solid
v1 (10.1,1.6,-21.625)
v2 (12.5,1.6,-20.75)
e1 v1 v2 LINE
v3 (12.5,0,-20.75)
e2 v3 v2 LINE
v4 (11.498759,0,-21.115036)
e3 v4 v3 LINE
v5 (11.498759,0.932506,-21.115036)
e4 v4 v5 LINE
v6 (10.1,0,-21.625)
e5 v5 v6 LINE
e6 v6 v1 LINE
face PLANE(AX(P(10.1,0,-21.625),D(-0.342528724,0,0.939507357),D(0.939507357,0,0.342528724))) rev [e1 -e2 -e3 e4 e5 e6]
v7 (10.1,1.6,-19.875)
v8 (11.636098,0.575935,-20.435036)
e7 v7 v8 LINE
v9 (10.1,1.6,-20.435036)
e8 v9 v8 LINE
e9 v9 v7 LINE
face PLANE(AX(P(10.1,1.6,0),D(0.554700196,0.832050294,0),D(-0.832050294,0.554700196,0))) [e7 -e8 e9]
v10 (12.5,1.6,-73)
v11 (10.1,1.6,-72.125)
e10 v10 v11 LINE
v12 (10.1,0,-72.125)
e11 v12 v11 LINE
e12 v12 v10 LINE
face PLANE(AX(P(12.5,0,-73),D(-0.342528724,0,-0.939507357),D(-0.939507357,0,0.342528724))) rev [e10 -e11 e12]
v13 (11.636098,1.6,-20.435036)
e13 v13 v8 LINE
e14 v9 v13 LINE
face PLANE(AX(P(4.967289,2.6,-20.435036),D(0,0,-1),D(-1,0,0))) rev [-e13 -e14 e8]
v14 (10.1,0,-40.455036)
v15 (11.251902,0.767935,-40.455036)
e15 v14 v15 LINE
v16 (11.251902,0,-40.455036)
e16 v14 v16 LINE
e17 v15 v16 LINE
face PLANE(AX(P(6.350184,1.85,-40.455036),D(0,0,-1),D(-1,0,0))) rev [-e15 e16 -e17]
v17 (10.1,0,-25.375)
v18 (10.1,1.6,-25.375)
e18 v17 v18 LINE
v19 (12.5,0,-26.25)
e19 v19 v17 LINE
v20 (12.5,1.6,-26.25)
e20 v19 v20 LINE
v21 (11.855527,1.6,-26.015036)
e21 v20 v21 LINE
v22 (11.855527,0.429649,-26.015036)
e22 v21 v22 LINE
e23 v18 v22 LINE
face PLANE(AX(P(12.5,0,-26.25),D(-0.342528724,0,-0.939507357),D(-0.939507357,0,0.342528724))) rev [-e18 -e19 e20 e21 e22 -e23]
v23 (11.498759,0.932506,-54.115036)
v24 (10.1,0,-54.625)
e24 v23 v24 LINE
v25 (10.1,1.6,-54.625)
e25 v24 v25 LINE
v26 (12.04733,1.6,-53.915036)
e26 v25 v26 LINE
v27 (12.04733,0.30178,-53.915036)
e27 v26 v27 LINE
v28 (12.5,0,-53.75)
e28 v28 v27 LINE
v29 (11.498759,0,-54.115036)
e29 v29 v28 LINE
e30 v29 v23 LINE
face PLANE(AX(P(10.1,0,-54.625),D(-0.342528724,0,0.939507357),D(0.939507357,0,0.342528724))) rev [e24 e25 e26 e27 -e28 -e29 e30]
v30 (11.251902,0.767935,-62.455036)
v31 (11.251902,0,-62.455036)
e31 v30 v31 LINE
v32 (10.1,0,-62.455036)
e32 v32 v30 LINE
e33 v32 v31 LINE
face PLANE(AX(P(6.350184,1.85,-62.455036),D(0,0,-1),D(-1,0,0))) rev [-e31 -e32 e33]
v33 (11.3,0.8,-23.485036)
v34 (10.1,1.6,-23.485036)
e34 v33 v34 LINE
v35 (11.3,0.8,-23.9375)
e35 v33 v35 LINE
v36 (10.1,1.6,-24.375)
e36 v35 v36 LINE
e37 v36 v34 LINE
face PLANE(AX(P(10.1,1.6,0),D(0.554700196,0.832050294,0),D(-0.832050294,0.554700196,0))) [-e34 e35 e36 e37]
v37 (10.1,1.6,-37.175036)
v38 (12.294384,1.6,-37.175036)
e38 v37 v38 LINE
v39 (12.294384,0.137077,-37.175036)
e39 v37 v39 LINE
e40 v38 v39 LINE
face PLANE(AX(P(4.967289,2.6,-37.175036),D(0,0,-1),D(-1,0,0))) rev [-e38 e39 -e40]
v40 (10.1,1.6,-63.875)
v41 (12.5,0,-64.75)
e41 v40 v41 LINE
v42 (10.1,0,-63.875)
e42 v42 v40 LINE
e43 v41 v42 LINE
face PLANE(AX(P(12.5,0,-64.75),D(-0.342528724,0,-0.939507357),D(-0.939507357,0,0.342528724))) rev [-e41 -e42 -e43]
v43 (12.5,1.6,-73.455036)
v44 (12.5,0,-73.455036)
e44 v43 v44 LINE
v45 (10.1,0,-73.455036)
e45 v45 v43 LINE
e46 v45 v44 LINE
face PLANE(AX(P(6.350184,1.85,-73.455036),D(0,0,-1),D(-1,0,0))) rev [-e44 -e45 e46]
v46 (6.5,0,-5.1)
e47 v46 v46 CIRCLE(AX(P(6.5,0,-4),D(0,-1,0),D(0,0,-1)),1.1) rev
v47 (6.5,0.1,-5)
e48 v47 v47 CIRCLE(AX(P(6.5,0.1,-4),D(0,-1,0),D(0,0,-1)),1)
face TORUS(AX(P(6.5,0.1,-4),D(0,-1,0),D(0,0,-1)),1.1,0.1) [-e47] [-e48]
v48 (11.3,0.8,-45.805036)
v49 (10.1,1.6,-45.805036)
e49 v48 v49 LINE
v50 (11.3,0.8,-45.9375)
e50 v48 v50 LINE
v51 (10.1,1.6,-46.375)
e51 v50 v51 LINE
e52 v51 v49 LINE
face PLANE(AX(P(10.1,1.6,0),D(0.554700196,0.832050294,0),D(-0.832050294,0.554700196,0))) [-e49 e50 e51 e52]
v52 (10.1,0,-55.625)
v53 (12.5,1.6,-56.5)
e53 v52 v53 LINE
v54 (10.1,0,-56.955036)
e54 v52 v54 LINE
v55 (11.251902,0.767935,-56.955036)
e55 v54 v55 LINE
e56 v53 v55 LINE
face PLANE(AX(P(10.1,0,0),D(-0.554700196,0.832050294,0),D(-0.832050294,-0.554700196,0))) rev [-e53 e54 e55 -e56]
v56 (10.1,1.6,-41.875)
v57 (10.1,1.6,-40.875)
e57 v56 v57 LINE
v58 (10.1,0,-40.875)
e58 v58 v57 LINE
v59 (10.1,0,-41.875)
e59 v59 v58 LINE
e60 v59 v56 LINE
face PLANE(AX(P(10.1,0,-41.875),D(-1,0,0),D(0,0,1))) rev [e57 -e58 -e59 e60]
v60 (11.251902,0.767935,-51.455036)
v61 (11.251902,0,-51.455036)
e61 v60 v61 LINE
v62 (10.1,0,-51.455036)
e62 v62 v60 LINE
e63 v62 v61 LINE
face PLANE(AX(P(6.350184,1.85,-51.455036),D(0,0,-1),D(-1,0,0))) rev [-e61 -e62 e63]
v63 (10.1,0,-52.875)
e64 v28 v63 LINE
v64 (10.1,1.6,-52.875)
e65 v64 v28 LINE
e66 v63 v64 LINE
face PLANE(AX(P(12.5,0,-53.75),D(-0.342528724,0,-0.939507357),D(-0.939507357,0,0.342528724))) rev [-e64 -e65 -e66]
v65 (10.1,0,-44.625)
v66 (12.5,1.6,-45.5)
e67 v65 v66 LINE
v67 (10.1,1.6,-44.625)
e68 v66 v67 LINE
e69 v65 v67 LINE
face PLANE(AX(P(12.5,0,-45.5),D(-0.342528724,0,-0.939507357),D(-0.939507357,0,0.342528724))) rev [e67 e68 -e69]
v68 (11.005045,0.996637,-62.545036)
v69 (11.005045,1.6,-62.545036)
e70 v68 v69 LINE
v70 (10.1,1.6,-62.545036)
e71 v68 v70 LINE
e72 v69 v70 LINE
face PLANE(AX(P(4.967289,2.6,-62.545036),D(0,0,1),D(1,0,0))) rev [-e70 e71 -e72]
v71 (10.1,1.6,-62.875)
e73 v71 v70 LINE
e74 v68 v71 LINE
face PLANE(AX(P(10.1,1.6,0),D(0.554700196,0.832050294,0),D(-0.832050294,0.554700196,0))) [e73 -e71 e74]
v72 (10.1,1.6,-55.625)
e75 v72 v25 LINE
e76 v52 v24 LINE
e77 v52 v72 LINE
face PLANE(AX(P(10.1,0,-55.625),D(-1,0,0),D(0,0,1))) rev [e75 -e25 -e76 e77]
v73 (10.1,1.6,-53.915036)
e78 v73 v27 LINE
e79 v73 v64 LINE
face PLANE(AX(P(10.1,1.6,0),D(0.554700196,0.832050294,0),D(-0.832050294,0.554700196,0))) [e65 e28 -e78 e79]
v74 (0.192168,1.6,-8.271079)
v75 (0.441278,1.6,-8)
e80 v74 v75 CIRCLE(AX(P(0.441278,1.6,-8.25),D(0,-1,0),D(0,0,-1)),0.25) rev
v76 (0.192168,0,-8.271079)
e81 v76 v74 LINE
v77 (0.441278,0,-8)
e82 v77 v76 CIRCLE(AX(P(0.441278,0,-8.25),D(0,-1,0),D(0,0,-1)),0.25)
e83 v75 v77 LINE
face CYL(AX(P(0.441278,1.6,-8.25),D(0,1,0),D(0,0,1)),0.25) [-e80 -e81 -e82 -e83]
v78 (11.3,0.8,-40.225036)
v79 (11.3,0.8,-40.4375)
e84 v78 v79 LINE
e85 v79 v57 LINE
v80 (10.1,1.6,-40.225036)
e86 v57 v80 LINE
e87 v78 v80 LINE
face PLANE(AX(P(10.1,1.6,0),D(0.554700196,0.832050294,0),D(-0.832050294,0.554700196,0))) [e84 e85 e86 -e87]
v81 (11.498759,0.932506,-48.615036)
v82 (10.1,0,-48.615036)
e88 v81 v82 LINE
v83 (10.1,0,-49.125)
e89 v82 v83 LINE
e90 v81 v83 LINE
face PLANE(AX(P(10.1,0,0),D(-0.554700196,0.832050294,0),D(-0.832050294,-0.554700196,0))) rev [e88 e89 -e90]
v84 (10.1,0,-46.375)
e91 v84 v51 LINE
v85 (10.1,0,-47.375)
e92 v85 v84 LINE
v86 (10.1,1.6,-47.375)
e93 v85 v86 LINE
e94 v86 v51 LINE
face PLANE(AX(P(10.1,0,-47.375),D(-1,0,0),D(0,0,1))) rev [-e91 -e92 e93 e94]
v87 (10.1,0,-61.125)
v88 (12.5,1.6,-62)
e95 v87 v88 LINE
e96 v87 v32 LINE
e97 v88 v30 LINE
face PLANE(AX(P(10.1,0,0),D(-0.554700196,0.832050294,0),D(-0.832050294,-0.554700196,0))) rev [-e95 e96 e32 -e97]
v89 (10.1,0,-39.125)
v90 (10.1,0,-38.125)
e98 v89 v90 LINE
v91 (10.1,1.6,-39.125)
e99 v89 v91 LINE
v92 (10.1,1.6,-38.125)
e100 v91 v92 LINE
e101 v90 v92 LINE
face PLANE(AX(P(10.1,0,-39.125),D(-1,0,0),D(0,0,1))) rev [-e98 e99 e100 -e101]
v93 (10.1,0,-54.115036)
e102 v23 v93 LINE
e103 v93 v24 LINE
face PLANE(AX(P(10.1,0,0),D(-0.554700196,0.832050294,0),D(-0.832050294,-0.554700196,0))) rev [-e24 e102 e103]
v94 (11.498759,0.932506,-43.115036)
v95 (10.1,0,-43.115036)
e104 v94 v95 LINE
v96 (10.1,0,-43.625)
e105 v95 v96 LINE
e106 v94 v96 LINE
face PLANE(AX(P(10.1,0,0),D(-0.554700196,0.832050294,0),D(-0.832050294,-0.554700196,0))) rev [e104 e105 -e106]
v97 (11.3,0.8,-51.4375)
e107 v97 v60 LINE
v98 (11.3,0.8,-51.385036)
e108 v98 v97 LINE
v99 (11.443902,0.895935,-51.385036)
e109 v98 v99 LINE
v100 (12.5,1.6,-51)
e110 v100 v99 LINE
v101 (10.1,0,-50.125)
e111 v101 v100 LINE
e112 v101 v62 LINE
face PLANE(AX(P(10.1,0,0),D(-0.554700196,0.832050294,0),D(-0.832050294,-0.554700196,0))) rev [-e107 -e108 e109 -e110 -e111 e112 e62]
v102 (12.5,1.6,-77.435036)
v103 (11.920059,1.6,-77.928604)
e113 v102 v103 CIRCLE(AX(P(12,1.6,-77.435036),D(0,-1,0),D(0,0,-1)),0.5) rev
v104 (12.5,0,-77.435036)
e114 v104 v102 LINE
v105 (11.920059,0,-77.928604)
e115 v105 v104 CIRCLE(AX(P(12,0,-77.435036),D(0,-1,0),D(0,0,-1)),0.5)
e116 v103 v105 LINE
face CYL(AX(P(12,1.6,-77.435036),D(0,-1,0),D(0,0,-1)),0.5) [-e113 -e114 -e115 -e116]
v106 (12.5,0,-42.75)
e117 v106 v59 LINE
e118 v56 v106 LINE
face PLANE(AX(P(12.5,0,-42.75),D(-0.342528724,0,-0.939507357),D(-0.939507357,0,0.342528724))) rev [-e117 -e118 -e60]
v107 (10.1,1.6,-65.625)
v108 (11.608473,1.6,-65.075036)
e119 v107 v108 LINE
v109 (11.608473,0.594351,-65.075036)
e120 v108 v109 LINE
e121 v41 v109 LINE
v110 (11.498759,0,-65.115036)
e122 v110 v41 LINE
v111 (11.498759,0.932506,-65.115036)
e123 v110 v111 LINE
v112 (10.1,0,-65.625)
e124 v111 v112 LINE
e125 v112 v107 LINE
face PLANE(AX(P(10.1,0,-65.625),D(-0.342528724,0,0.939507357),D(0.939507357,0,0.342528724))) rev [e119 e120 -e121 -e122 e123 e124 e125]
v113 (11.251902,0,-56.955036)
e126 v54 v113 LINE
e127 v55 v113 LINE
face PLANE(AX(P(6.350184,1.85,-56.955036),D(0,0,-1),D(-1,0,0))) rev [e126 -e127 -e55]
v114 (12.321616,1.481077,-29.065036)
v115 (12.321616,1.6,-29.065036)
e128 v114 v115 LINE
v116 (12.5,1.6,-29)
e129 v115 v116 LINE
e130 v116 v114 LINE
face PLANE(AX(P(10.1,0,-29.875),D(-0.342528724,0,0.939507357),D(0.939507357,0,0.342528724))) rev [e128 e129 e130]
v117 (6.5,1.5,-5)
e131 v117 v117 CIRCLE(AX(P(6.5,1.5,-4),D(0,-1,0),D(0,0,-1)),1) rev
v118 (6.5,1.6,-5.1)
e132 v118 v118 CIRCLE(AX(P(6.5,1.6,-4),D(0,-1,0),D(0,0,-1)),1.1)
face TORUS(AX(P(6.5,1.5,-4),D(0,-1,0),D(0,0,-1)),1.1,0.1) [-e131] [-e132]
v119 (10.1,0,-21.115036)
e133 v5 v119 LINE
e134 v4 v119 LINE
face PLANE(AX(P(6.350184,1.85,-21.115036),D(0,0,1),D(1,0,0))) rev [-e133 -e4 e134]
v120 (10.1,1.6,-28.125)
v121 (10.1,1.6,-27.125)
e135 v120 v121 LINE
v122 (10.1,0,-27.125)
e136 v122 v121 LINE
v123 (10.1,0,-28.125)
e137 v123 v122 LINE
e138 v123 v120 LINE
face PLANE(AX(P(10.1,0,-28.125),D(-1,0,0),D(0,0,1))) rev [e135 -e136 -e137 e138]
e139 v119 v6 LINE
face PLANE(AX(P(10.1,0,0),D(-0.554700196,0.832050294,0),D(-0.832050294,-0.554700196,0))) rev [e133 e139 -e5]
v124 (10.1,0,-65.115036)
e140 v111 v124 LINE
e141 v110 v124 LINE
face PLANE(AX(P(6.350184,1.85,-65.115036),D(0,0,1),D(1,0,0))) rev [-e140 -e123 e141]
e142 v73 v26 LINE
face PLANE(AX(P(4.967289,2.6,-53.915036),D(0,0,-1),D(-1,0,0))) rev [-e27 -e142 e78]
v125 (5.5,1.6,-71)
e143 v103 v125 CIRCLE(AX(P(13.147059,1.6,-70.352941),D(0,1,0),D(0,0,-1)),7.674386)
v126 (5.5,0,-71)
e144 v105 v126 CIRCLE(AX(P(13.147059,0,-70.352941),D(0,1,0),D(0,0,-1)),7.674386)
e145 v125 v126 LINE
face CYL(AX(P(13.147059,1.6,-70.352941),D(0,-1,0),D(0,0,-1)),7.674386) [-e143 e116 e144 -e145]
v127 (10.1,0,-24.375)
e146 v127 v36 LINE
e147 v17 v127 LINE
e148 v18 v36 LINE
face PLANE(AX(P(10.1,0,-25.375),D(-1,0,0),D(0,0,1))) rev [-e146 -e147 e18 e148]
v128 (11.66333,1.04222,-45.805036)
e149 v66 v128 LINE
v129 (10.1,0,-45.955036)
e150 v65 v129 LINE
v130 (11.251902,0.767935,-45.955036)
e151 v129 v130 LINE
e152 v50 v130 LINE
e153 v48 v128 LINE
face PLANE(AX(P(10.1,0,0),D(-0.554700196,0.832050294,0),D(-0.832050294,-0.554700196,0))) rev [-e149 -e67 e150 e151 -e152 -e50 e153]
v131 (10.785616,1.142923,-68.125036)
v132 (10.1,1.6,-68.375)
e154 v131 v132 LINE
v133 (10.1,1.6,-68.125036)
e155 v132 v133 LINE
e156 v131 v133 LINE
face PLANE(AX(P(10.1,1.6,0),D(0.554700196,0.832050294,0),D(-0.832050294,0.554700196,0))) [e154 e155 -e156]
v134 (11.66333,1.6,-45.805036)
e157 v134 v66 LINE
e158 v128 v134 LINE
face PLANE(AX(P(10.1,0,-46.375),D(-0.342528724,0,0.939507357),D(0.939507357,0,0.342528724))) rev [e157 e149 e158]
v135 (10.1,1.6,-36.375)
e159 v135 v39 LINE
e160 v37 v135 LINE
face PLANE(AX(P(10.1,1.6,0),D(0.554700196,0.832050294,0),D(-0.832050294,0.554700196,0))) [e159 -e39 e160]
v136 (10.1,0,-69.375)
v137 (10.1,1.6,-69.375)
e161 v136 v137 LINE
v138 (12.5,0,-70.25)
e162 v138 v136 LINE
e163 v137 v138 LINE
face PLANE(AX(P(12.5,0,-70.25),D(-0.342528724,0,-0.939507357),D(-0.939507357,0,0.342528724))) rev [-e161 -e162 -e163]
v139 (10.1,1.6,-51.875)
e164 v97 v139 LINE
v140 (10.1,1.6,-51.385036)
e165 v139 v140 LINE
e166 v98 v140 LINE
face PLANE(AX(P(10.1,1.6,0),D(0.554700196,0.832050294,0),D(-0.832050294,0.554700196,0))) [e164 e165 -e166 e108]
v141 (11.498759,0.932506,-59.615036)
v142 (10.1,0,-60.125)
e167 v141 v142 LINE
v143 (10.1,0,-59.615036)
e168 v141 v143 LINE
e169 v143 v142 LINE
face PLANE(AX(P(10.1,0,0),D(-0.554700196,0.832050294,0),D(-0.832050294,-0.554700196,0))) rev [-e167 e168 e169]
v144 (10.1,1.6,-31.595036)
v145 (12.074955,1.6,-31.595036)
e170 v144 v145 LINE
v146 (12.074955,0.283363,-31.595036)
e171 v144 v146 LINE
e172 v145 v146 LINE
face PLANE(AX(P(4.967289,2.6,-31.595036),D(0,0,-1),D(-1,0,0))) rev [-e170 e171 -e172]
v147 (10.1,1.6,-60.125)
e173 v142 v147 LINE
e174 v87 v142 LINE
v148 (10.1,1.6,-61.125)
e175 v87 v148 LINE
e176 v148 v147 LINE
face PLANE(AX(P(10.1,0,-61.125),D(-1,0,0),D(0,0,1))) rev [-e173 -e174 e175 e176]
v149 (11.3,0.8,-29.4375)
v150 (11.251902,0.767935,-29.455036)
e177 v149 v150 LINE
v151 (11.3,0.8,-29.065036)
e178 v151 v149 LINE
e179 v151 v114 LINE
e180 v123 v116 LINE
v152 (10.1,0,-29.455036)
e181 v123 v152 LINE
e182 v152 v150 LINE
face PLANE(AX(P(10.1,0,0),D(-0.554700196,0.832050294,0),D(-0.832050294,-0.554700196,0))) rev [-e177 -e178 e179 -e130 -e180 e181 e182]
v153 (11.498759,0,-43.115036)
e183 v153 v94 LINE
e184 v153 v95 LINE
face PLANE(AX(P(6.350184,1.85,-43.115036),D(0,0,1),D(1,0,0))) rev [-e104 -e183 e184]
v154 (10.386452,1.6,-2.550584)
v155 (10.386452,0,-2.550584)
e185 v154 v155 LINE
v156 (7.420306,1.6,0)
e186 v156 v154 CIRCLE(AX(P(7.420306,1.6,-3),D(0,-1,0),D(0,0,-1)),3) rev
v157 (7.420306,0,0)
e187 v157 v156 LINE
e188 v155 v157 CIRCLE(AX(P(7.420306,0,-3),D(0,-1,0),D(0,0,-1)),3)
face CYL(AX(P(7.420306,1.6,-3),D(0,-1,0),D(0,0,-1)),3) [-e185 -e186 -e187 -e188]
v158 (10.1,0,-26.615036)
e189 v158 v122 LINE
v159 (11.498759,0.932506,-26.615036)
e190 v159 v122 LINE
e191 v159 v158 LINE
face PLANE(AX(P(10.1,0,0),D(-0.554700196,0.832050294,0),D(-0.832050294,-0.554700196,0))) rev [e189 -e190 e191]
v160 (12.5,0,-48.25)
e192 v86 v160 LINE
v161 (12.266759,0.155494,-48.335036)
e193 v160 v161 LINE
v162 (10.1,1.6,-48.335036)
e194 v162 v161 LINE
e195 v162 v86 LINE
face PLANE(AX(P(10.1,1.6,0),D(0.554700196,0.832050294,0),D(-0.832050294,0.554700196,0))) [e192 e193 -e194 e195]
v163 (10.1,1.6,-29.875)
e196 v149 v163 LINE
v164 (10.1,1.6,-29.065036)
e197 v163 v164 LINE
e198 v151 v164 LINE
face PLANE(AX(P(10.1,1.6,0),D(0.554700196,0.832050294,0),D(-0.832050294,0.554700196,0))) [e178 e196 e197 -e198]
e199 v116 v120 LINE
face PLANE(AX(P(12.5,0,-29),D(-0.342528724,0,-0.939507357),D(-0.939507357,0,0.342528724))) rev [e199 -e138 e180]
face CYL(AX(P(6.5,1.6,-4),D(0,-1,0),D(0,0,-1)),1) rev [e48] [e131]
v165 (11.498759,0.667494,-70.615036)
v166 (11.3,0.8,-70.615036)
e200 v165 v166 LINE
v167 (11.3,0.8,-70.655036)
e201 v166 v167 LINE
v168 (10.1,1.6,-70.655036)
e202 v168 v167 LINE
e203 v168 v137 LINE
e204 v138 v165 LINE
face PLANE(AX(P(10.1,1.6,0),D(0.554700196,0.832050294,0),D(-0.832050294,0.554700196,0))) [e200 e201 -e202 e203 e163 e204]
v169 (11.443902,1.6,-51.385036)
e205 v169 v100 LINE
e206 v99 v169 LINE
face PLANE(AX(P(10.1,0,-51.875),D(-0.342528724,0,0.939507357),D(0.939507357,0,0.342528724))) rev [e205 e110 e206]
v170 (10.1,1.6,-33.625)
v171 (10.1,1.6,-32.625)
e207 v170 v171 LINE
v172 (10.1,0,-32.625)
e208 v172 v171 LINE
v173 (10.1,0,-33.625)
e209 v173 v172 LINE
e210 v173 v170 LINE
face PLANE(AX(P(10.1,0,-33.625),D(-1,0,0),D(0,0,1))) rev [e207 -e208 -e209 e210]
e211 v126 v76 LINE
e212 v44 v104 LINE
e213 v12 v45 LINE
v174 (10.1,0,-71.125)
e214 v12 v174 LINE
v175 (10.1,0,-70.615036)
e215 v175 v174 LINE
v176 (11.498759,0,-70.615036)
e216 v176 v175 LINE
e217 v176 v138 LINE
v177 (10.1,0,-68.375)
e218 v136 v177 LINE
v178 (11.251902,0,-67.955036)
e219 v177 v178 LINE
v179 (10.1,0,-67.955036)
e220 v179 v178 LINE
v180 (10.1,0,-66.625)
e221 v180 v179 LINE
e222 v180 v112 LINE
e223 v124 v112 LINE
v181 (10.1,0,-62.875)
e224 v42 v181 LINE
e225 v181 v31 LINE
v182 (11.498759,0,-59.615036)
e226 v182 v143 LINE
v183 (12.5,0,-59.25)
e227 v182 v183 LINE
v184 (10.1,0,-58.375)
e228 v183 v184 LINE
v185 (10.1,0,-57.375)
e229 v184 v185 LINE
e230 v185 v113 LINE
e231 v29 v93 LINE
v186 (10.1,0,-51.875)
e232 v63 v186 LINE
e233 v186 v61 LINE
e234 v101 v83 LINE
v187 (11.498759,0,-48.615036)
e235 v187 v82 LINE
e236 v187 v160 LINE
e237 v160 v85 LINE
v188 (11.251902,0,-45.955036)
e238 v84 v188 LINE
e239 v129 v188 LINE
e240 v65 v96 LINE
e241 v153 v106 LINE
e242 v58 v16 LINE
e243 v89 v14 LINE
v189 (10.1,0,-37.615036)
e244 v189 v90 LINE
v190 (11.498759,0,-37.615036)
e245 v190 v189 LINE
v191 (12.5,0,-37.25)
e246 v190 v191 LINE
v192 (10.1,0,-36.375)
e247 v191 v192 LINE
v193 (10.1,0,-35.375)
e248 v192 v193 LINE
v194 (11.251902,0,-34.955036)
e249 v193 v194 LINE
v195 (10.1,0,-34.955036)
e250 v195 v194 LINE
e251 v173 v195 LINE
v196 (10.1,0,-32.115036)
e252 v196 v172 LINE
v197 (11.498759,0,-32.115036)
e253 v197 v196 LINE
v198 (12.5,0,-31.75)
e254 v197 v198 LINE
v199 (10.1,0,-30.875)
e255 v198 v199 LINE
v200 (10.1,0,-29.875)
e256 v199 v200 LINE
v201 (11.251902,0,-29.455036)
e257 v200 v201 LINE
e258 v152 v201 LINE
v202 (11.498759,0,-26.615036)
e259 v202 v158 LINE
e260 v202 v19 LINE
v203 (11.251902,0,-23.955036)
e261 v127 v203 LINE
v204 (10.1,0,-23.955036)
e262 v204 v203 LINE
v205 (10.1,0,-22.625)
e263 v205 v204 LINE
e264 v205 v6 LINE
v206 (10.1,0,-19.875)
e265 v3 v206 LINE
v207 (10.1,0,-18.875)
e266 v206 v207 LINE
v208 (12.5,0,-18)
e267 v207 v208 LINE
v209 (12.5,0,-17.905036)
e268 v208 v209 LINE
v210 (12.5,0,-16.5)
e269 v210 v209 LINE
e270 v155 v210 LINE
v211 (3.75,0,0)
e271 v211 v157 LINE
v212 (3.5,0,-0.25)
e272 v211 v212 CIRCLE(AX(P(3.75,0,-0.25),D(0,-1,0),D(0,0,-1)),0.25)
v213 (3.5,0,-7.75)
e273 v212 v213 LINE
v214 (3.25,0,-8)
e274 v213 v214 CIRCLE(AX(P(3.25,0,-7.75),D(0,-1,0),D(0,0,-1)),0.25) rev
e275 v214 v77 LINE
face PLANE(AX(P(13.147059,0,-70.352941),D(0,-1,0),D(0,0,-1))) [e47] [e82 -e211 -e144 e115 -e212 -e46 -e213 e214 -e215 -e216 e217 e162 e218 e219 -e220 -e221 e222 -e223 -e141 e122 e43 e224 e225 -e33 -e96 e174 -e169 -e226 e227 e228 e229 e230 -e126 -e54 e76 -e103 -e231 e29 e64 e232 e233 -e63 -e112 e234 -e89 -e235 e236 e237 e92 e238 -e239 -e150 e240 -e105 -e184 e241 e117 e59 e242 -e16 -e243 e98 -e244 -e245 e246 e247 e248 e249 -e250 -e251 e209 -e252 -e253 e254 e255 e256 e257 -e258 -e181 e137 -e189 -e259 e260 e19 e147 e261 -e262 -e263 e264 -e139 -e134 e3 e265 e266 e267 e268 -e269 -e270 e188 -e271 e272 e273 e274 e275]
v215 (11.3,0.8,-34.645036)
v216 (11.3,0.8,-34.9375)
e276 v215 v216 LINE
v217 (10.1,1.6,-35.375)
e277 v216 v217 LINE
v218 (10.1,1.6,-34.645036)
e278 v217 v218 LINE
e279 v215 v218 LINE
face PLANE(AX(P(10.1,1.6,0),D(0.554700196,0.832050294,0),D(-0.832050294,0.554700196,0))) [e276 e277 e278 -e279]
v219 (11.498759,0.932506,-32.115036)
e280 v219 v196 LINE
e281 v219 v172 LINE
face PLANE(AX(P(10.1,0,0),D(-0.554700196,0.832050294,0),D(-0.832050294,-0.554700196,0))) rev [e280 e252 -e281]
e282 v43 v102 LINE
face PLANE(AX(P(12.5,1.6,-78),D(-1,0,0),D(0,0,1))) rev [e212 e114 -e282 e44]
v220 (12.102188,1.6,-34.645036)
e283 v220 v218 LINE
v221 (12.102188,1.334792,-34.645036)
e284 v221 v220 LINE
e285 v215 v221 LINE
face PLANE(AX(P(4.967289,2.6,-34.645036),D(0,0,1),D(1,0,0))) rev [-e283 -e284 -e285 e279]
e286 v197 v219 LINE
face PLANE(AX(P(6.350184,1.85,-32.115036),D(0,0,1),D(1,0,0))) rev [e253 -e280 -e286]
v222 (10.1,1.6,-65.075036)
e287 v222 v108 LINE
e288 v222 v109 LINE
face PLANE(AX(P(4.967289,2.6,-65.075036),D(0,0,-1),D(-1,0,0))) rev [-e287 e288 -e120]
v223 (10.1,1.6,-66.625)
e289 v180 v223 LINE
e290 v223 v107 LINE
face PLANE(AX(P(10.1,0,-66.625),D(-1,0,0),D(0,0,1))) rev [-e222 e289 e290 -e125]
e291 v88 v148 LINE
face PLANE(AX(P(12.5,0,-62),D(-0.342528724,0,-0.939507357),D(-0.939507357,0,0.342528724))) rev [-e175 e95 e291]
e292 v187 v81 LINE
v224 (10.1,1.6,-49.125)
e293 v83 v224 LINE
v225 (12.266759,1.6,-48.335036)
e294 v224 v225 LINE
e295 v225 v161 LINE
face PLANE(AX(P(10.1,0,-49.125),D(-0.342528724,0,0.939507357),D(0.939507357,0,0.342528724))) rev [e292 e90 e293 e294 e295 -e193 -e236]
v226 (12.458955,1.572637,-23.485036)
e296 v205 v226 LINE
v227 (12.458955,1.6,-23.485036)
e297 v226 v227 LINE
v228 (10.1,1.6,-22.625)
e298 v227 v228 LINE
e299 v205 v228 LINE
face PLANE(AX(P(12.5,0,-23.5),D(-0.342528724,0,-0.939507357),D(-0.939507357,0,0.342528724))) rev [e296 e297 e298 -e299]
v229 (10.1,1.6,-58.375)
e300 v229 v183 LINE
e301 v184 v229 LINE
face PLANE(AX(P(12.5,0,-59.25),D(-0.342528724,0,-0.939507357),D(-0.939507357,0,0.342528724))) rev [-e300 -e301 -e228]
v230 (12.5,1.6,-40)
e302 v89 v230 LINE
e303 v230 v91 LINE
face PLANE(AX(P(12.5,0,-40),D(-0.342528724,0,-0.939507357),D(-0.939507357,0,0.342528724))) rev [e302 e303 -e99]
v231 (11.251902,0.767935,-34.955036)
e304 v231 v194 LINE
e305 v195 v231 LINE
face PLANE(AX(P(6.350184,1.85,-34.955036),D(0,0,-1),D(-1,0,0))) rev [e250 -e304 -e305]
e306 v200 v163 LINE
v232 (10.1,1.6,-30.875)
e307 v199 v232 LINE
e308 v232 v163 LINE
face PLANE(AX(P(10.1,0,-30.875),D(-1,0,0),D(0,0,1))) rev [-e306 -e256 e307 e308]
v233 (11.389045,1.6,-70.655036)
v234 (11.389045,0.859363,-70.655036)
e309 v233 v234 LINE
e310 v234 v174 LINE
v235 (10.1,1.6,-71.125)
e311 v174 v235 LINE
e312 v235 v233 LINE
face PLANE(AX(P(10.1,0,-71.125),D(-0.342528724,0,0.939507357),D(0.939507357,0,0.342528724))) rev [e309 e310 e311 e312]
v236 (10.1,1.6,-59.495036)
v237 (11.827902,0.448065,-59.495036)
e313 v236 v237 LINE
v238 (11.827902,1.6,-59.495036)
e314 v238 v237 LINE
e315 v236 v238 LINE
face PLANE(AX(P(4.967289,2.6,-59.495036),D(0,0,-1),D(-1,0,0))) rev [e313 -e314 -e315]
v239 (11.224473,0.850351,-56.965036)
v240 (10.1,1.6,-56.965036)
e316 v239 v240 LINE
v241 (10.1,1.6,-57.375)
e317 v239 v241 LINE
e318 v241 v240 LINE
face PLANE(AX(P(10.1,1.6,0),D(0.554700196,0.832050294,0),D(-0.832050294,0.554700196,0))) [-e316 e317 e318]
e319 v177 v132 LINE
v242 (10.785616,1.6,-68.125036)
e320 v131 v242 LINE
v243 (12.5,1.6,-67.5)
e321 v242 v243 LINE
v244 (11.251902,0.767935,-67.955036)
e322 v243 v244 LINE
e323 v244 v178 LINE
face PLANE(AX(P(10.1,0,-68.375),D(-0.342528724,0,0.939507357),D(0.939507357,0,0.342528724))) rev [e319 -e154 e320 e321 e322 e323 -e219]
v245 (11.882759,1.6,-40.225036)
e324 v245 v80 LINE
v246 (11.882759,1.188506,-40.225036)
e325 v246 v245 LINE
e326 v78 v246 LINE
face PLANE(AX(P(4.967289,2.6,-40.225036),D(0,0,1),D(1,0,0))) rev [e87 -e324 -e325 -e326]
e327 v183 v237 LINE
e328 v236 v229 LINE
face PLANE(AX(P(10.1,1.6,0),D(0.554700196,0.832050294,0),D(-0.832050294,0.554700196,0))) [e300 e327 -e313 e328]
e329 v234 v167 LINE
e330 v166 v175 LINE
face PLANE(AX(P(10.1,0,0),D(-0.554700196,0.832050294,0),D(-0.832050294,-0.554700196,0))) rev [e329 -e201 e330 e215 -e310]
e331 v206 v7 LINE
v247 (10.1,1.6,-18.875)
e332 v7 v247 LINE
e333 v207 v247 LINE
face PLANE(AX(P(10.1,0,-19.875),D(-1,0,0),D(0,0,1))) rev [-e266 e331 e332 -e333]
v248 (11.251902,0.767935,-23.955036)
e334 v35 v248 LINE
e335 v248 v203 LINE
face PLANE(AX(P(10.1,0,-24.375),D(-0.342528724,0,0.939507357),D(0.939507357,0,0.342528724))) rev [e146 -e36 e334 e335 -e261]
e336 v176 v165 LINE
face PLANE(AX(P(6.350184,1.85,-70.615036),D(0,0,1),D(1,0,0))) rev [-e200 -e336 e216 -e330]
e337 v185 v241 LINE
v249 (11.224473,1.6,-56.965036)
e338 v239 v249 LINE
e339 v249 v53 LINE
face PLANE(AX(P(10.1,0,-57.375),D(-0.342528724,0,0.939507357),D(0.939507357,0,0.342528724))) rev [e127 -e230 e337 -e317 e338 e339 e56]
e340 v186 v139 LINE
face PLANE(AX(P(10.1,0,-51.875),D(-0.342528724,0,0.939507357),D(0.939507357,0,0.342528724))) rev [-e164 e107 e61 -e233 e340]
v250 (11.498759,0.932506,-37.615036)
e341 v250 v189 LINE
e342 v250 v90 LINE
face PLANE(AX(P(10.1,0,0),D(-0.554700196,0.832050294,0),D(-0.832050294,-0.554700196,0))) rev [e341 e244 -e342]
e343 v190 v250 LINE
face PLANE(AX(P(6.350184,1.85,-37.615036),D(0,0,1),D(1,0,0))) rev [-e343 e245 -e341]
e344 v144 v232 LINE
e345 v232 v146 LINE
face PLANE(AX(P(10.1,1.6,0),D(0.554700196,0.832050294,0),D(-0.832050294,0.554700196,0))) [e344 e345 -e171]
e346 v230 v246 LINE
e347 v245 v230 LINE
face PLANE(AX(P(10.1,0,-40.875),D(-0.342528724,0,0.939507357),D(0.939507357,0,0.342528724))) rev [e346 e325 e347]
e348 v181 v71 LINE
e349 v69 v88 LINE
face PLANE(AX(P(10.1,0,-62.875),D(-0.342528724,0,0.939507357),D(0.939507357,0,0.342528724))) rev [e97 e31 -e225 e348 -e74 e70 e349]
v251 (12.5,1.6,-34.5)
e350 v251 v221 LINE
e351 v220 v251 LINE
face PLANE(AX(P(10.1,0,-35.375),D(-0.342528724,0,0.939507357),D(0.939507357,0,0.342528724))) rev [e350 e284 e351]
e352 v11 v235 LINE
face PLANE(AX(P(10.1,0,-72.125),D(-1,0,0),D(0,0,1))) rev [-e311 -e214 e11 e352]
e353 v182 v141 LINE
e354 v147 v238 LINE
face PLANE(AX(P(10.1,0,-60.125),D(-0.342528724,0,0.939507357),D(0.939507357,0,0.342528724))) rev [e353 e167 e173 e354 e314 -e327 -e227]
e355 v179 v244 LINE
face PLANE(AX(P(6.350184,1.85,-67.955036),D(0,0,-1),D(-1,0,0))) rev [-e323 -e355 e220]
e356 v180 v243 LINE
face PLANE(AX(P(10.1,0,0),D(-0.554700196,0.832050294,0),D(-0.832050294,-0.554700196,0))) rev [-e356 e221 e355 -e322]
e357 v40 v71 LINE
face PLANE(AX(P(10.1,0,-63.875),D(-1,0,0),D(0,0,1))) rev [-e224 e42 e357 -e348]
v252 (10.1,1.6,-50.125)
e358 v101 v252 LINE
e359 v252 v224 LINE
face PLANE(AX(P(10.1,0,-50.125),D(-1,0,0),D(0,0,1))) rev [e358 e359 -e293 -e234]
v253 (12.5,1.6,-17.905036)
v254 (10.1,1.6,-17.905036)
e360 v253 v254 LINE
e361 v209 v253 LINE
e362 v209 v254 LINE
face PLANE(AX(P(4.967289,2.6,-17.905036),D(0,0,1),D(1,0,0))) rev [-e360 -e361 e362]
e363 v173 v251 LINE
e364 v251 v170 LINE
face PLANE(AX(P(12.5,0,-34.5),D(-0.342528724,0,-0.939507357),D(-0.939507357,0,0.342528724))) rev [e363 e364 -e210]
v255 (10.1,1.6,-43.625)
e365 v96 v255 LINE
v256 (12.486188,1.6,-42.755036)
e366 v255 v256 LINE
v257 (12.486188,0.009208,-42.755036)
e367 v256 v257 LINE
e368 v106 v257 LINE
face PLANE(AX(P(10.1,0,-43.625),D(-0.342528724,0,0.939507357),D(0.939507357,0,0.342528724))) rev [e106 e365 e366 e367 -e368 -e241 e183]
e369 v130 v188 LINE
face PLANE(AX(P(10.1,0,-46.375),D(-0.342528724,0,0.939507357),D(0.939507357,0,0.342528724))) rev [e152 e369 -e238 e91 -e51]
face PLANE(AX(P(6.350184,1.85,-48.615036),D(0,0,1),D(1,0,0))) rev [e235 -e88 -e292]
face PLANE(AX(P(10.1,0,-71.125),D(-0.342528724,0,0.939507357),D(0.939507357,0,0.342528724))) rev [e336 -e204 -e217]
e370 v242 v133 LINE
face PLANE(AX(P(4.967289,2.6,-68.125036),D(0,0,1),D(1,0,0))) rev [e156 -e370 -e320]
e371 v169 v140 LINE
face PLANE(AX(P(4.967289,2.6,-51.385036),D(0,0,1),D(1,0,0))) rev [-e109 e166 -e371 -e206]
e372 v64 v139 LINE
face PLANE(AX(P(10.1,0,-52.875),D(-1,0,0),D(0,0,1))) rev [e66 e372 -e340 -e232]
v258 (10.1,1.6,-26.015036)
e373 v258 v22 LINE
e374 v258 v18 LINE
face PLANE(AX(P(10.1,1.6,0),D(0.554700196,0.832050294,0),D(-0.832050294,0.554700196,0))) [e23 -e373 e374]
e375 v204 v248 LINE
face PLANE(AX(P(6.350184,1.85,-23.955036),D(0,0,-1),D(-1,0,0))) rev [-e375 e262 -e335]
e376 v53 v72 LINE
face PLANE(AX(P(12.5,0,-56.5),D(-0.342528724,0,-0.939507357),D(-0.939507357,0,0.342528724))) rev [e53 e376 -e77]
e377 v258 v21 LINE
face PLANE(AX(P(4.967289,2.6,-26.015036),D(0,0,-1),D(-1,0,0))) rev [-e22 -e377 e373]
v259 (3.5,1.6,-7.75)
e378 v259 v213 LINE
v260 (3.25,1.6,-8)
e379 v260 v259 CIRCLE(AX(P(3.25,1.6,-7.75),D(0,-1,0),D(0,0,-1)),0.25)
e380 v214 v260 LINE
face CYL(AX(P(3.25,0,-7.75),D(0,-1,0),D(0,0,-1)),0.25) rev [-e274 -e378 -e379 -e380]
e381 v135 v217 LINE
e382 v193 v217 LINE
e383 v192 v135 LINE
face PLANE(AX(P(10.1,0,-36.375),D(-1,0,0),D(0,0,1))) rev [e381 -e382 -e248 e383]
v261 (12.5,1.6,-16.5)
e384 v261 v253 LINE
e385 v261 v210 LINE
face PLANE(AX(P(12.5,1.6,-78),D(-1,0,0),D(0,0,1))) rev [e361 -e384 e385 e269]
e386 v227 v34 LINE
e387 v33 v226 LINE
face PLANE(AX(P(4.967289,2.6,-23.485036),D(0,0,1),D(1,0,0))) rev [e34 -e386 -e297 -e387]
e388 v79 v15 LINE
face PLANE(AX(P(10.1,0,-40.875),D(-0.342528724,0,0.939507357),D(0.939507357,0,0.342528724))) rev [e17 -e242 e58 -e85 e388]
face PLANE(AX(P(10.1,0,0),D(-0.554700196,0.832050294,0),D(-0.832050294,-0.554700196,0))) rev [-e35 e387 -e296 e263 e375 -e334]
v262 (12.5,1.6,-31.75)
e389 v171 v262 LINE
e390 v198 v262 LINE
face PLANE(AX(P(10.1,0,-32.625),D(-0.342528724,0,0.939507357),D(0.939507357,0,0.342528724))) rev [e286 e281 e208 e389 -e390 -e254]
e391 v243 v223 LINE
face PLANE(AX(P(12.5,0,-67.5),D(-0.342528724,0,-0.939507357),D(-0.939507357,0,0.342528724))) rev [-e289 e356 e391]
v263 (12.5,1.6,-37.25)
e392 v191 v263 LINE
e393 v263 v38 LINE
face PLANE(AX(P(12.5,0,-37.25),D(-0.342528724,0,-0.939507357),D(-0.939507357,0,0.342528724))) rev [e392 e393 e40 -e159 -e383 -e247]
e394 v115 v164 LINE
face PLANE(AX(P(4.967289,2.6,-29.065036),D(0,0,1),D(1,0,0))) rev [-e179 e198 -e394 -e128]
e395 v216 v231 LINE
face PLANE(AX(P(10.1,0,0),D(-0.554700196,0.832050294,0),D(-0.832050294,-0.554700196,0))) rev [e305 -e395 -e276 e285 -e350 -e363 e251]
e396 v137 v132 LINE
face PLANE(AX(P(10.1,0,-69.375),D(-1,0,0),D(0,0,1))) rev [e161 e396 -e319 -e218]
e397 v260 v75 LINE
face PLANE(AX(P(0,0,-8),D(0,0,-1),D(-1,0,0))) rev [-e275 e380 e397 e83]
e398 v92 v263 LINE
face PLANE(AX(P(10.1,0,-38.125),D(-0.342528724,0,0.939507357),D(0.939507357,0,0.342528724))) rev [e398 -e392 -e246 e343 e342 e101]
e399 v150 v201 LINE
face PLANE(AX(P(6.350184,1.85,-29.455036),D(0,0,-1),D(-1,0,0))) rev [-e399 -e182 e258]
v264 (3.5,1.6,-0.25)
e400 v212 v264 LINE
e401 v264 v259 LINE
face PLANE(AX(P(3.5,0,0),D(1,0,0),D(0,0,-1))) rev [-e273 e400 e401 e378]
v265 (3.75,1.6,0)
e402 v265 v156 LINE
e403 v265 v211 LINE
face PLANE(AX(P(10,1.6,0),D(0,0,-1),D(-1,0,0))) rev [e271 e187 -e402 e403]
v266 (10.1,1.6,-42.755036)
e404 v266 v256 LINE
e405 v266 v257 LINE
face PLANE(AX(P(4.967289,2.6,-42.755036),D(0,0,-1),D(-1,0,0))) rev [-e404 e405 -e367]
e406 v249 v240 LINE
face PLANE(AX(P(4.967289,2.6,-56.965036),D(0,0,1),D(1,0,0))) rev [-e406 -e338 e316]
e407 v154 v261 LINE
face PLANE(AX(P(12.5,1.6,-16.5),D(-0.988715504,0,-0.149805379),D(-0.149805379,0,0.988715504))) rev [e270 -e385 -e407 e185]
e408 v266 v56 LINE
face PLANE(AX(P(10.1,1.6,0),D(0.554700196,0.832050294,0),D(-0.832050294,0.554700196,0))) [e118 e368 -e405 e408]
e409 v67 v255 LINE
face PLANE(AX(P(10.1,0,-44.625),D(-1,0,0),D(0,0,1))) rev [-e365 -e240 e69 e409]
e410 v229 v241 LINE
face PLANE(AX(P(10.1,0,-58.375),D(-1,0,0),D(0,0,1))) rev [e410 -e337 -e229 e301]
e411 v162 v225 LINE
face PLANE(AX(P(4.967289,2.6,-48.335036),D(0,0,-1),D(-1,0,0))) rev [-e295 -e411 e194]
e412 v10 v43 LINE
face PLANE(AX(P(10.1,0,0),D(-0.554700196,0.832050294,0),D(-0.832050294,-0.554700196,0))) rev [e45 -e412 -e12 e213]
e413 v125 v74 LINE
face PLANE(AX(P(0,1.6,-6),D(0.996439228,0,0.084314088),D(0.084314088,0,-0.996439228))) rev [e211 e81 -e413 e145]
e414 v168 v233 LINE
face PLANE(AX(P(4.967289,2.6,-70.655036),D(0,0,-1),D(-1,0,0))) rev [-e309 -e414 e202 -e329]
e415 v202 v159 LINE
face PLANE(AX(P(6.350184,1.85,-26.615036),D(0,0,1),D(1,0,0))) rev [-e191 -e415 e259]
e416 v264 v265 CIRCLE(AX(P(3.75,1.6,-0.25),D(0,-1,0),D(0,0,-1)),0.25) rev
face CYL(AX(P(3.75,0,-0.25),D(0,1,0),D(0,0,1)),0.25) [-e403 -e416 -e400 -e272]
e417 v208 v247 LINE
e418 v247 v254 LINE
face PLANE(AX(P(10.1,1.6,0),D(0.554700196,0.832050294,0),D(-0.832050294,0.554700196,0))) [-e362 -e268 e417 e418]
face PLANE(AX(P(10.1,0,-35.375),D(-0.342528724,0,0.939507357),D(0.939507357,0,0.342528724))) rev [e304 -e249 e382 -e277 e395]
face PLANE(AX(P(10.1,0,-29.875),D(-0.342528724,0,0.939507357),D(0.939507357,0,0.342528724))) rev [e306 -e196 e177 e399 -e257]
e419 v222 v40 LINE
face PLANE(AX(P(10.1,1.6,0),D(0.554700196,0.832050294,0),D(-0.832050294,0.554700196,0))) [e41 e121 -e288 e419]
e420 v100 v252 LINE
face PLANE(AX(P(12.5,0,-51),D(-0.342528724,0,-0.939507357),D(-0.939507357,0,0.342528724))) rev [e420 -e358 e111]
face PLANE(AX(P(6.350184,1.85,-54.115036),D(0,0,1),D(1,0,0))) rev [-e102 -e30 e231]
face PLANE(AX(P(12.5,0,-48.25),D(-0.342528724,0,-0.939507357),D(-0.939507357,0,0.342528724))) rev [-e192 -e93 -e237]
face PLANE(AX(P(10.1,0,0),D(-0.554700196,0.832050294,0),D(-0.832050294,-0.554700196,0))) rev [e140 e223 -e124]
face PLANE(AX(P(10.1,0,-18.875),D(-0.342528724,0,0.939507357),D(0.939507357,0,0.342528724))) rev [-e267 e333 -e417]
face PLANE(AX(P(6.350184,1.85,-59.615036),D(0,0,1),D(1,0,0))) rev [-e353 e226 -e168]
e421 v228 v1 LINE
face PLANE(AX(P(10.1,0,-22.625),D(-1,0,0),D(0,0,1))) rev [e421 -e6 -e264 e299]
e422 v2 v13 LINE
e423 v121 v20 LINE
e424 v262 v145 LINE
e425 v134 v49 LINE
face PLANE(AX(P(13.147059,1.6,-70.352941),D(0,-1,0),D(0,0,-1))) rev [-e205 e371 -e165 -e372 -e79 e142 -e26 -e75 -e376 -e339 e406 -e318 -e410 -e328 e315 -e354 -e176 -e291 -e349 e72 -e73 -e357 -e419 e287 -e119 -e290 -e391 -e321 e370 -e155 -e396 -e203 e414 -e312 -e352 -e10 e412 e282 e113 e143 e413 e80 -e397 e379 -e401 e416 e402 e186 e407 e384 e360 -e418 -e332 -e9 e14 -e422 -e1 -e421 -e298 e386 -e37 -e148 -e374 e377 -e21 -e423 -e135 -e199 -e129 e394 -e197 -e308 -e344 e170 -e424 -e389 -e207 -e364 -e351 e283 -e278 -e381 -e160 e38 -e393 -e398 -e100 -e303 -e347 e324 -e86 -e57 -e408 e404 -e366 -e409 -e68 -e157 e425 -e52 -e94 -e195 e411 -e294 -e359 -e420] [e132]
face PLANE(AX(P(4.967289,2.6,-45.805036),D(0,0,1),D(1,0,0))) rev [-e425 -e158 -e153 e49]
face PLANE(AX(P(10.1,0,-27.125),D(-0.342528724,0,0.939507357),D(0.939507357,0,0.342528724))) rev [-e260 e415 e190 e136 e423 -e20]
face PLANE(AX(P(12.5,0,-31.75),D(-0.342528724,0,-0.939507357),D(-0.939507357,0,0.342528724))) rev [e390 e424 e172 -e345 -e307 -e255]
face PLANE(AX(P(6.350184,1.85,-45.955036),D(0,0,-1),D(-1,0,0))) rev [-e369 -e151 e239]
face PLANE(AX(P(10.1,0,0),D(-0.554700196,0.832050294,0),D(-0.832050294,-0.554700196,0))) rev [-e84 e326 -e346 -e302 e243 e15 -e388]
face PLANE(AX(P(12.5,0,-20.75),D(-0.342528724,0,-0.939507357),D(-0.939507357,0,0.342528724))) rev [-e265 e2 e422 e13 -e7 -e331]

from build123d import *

# Parameters (mm, degrees)
SKETCH1_R              = 1
BOSS_EXTRUDE1_DEPTH    = 1.6
SKETCH2_W              = 3.5
SKETCH2_H              = 8
CUT_EXTRUDE1_DEPTH     = 80.011454866
FILLET1_R              = 3
FILLET3_R              = 0.1
FILLET4_R              = 0.25
CUT_EXTRUDE2_DEPTH     = 80.011454866
LPATTERN1_COUNT        = 20
LPATTERN1_PITCH        = 2.75
FILLET5_R              = 0.5
CUT_EXTRUDE3_START     = 5.602471982
CUT_EXTRUDE3_OUTLINE_W = 6
CUT_EXTRUDE3_OUTLINE_H = 2.84
CUT_EXTRUDE3_DEPTH     = 1.331280471
CUT_EXTRUDE4_REACH     = 81.346
SKETCH7_W              = 2.53
SKETCH7_H              = 4


with BuildPart() as part:
    # Sketch1 → Boss-Extrude1 (new body)
    with BuildSketch(Plane(origin=(0, 0, 0), x_dir=(1, 0, 0), z_dir=(0, 1, 0))):
        with BuildLine():
            Line((0, 0), (0, 6))
            Line((0, 6), (5.5, 71))
            ThreePointArc((5.5, 71), (7.72044875, 75.77955125), (12.5, 78))
            Line((12.5, 78), (12.5, 16.5))
            Line((12.5, 16.5), (10, 0))
            Line((10, 0), (0, 0))
        make_face()
        with Locations(Location((6.5, 4, 0), (0, 0, 270))):
            Circle(SKETCH1_R, mode=Mode.SUBTRACT)
    extrude(amount=BOSS_EXTRUDE1_DEPTH)

    # Sketch2 → Cut-Extrude1 (cut, through all)
    with BuildSketch(Plane(origin=(0, 1.6, 0), x_dir=(1, 0, 0), z_dir=(0, 1, 0))):
        with Locations((1.75, 4)):
            Rectangle(SKETCH2_W, SKETCH2_H)
    extrude(amount=-CUT_EXTRUDE1_DEPTH, mode=Mode.SUBTRACT)

    # Fillet1
    fillet1_edges = [part.edges().sort_by_distance(p)[0] for p in [
        (10, 0.8, 0),
    ]]
    fillet(fillet1_edges, radius=FILLET1_R)

    # Fillet3
    fillet3_edges = [part.edges().sort_by_distance(p)[0] for p in [
        (6.5, 0, -5),
        (6.5, 1.6, -5),
    ]]
    fillet(fillet3_edges, radius=FILLET3_R)

    # Fillet4
    fillet4_edges = [part.edges().sort_by_distance(p)[0] for p in [
        (0.169230769, 0.8, -8),
        (3.5, 0.8, -8),
        (3.5, 0.8, 0),
    ]]
    fillet(fillet4_edges, radius=FILLET4_R)

    # Sketch3 → Cut-Extrude2 (cut, through all)
    with BuildSketch(Plane(origin=(0, 1.6, 0), x_dir=(1, 0, 0), z_dir=(0, 1, 0))):
        Polygon((12.5, 73), (10.1, 72.125), (10.1, 71.125), (12.5, 70.25), align=None)
    cut_extrude2 = extrude(amount=-CUT_EXTRUDE2_DEPTH, mode=Mode.SUBTRACT)

    # LPattern1: Cut-Extrude2 ×20
    with Locations(*[(0, 0, i * LPATTERN1_PITCH) for i in range(1, LPATTERN1_COUNT)]):
        add(cut_extrude2, mode=Mode.SUBTRACT)

    # Fillet5
    fillet5_edges = [part.edges().sort_by_distance(p)[0] for p in [
        (12.5, 0.8, -78),
    ]]
    fillet(fillet5_edges, radius=FILLET5_R)

    # Cut-Extrude3: read off the stored shape, not the designer's step
    # Cut-Extrude3 outline → Cut-Extrude3 (cut)
    with BuildSketch(Plane(origin=(0, 0, 0), x_dir=(0.8320502943378438, 0.5547001962252289, 0), z_dir=(0.5547001962252289, -0.8320502943378438, 0)).offset(CUT_EXTRUDE3_START)):
        with Locations((10, -22.535035801)):
            Rectangle(CUT_EXTRUDE3_OUTLINE_W, CUT_EXTRUDE3_OUTLINE_H)
        with Locations((10, -28.035035801)):
            Rectangle(CUT_EXTRUDE3_OUTLINE_W, CUT_EXTRUDE3_OUTLINE_H)
        with Locations((10, -33.535035801)):
            Rectangle(CUT_EXTRUDE3_OUTLINE_W, CUT_EXTRUDE3_OUTLINE_H)
        with Locations((10, -39.035035801)):
            Rectangle(CUT_EXTRUDE3_OUTLINE_W, CUT_EXTRUDE3_OUTLINE_H)
        with Locations((10, -44.535035801)):
            Rectangle(CUT_EXTRUDE3_OUTLINE_W, CUT_EXTRUDE3_OUTLINE_H)
        with Locations((10, -50.035035801)):
            Rectangle(CUT_EXTRUDE3_OUTLINE_W, CUT_EXTRUDE3_OUTLINE_H)
        with Locations((10, -55.535035801)):
            Rectangle(CUT_EXTRUDE3_OUTLINE_W, CUT_EXTRUDE3_OUTLINE_H)
        with Locations((10, -61.035035801)):
            Rectangle(CUT_EXTRUDE3_OUTLINE_W, CUT_EXTRUDE3_OUTLINE_H)
        with Locations((10, -66.535035801)):
            Rectangle(CUT_EXTRUDE3_OUTLINE_W, CUT_EXTRUDE3_OUTLINE_H)
        with Locations((10, -72.035035801)):
            Rectangle(CUT_EXTRUDE3_OUTLINE_W, CUT_EXTRUDE3_OUTLINE_H)
    extrude(amount=CUT_EXTRUDE3_DEPTH, mode=Mode.SUBTRACT)

    # Cut-Extrude4: up to this plane
    cut_extrude4_end = Plane(origin=(10.1, 1.6, 0), z_dir=(0.5547001962252291, 0.8320502943378437, 0))
    # Sketch7 → Cut-Extrude4 (cut, up to the surface)
    with BuildSketch(Plane(origin=(15, 0, 0), x_dir=(0, 0, -1), z_dir=(1, 0, 0)), mode=Mode.PRIVATE) as cut_extrude4_sk1:
        with Locations((69.390035801, 0.6)):
            Rectangle(SKETCH7_W, SKETCH7_H)
    cut_extrude4_tool1 = split(extrude(cut_extrude4_sk1.sketch, amount=-CUT_EXTRUDE4_REACH, mode=Mode.PRIVATE), bisect_by=cut_extrude4_end, keep=Keep.BOTH, mode=Mode.PRIVATE)
    add(cut_extrude4_tool1.solids().sort_by_distance((15, 0.6, -69.390036))[0], mode=Mode.SUBTRACT)
    # Sketch7 → Cut-Extrude4 (cut, up to the surface)
    with BuildSketch(Plane(origin=(15, 0, 0), x_dir=(0, 0, -1), z_dir=(1, 0, 0)), mode=Mode.PRIVATE) as cut_extrude4_sk2:
        with Locations((63.810035801, 0.6)):
            Rectangle(SKETCH7_W, SKETCH7_H)
    cut_extrude4_tool2 = split(extrude(cut_extrude4_sk2.sketch, amount=-CUT_EXTRUDE4_REACH, mode=Mode.PRIVATE), bisect_by=cut_extrude4_end, keep=Keep.BOTH, mode=Mode.PRIVATE)
    add(cut_extrude4_tool2.solids().sort_by_distance((15, 0.6, -63.810036))[0], mode=Mode.SUBTRACT)
    # Sketch7 → Cut-Extrude4 (cut, up to the surface)
    with BuildSketch(Plane(origin=(15, 0, 0), x_dir=(0, 0, -1), z_dir=(1, 0, 0)), mode=Mode.PRIVATE) as cut_extrude4_sk3:
        with Locations((58.230035801, 0.6)):
            Rectangle(SKETCH7_W, SKETCH7_H)
    cut_extrude4_tool3 = split(extrude(cut_extrude4_sk3.sketch, amount=-CUT_EXTRUDE4_REACH, mode=Mode.PRIVATE), bisect_by=cut_extrude4_end, keep=Keep.BOTH, mode=Mode.PRIVATE)
    add(cut_extrude4_tool3.solids().sort_by_distance((15, 0.6, -58.230036))[0], mode=Mode.SUBTRACT)
    # Sketch7 → Cut-Extrude4 (cut, up to the surface)
    with BuildSketch(Plane(origin=(15, 0, 0), x_dir=(0, 0, -1), z_dir=(1, 0, 0)), mode=Mode.PRIVATE) as cut_extrude4_sk4:
        with Locations((52.650035801, 0.6)):
            Rectangle(SKETCH7_W, SKETCH7_H)
    cut_extrude4_tool4 = split(extrude(cut_extrude4_sk4.sketch, amount=-CUT_EXTRUDE4_REACH, mode=Mode.PRIVATE), bisect_by=cut_extrude4_end, keep=Keep.BOTH, mode=Mode.PRIVATE)
    add(cut_extrude4_tool4.solids().sort_by_distance((15, 0.6, -52.650036))[0], mode=Mode.SUBTRACT)
    # Sketch7 → Cut-Extrude4 (cut, up to the surface)
    with BuildSketch(Plane(origin=(15, 0, 0), x_dir=(0, 0, -1), z_dir=(1, 0, 0)), mode=Mode.PRIVATE) as cut_extrude4_sk5:
        with Locations((47.070035801, 0.6)):
            Rectangle(SKETCH7_W, SKETCH7_H)
    cut_extrude4_tool5 = split(extrude(cut_extrude4_sk5.sketch, amount=-CUT_EXTRUDE4_REACH, mode=Mode.PRIVATE), bisect_by=cut_extrude4_end, keep=Keep.BOTH, mode=Mode.PRIVATE)
    add(cut_extrude4_tool5.solids().sort_by_distance((15, 0.6, -47.070036))[0], mode=Mode.SUBTRACT)
    # Sketch7 → Cut-Extrude4 (cut, up to the surface)
    with BuildSketch(Plane(origin=(15, 0, 0), x_dir=(0, 0, -1), z_dir=(1, 0, 0)), mode=Mode.PRIVATE) as cut_extrude4_sk6:
        with Locations((41.490035801, 0.6)):
            Rectangle(SKETCH7_W, SKETCH7_H)
    cut_extrude4_tool6 = split(extrude(cut_extrude4_sk6.sketch, amount=-CUT_EXTRUDE4_REACH, mode=Mode.PRIVATE), bisect_by=cut_extrude4_end, keep=Keep.BOTH, mode=Mode.PRIVATE)
    add(cut_extrude4_tool6.solids().sort_by_distance((15, 0.6, -41.490036))[0], mode=Mode.SUBTRACT)
    # Sketch7 → Cut-Extrude4 (cut, up to the surface)
    with BuildSketch(Plane(origin=(15, 0, 0), x_dir=(0, 0, -1), z_dir=(1, 0, 0)), mode=Mode.PRIVATE) as cut_extrude4_sk7:
        with Locations((35.910035801, 0.6)):
            Rectangle(SKETCH7_W, SKETCH7_H)
    cut_extrude4_tool7 = split(extrude(cut_extrude4_sk7.sketch, amount=-CUT_EXTRUDE4_REACH, mode=Mode.PRIVATE), bisect_by=cut_extrude4_end, keep=Keep.BOTH, mode=Mode.PRIVATE)
    add(cut_extrude4_tool7.solids().sort_by_distance((15, 0.6, -35.910036))[0], mode=Mode.SUBTRACT)
    # Sketch7 → Cut-Extrude4 (cut, up to the surface)
    with BuildSketch(Plane(origin=(15, 0, 0), x_dir=(0, 0, -1), z_dir=(1, 0, 0)), mode=Mode.PRIVATE) as cut_extrude4_sk8:
        with Locations((30.330035801, 0.6)):
            Rectangle(SKETCH7_W, SKETCH7_H)
    cut_extrude4_tool8 = split(extrude(cut_extrude4_sk8.sketch, amount=-CUT_EXTRUDE4_REACH, mode=Mode.PRIVATE), bisect_by=cut_extrude4_end, keep=Keep.BOTH, mode=Mode.PRIVATE)
    add(cut_extrude4_tool8.solids().sort_by_distance((15, 0.6, -30.330036))[0], mode=Mode.SUBTRACT)
    # Sketch7 → Cut-Extrude4 (cut, up to the surface)
    with BuildSketch(Plane(origin=(15, 0, 0), x_dir=(0, 0, -1), z_dir=(1, 0, 0)), mode=Mode.PRIVATE) as cut_extrude4_sk9:
        with Locations((24.750035801, 0.6)):
            Rectangle(SKETCH7_W, SKETCH7_H)
    cut_extrude4_tool9 = split(extrude(cut_extrude4_sk9.sketch, amount=-CUT_EXTRUDE4_REACH, mode=Mode.PRIVATE), bisect_by=cut_extrude4_end, keep=Keep.BOTH, mode=Mode.PRIVATE)
    add(cut_extrude4_tool9.solids().sort_by_distance((15, 0.6, -24.750036))[0], mode=Mode.SUBTRACT)
    # Sketch7 → Cut-Extrude4 (cut, up to the surface)
    with BuildSketch(Plane(origin=(15, 0, 0), x_dir=(0, 0, -1), z_dir=(1, 0, 0)), mode=Mode.PRIVATE) as cut_extrude4_sk10:
        with Locations((19.170035801, 0.6)):
            Rectangle(SKETCH7_W, SKETCH7_H)
    cut_extrude4_tool10 = split(extrude(cut_extrude4_sk10.sketch, amount=-CUT_EXTRUDE4_REACH, mode=Mode.PRIVATE), bisect_by=cut_extrude4_end, keep=Keep.BOTH, mode=Mode.PRIVATE)
    add(cut_extrude4_tool10.solids().sort_by_distance((15, 0.6, -19.170036))[0], mode=Mode.SUBTRACT)


solid = part.part
